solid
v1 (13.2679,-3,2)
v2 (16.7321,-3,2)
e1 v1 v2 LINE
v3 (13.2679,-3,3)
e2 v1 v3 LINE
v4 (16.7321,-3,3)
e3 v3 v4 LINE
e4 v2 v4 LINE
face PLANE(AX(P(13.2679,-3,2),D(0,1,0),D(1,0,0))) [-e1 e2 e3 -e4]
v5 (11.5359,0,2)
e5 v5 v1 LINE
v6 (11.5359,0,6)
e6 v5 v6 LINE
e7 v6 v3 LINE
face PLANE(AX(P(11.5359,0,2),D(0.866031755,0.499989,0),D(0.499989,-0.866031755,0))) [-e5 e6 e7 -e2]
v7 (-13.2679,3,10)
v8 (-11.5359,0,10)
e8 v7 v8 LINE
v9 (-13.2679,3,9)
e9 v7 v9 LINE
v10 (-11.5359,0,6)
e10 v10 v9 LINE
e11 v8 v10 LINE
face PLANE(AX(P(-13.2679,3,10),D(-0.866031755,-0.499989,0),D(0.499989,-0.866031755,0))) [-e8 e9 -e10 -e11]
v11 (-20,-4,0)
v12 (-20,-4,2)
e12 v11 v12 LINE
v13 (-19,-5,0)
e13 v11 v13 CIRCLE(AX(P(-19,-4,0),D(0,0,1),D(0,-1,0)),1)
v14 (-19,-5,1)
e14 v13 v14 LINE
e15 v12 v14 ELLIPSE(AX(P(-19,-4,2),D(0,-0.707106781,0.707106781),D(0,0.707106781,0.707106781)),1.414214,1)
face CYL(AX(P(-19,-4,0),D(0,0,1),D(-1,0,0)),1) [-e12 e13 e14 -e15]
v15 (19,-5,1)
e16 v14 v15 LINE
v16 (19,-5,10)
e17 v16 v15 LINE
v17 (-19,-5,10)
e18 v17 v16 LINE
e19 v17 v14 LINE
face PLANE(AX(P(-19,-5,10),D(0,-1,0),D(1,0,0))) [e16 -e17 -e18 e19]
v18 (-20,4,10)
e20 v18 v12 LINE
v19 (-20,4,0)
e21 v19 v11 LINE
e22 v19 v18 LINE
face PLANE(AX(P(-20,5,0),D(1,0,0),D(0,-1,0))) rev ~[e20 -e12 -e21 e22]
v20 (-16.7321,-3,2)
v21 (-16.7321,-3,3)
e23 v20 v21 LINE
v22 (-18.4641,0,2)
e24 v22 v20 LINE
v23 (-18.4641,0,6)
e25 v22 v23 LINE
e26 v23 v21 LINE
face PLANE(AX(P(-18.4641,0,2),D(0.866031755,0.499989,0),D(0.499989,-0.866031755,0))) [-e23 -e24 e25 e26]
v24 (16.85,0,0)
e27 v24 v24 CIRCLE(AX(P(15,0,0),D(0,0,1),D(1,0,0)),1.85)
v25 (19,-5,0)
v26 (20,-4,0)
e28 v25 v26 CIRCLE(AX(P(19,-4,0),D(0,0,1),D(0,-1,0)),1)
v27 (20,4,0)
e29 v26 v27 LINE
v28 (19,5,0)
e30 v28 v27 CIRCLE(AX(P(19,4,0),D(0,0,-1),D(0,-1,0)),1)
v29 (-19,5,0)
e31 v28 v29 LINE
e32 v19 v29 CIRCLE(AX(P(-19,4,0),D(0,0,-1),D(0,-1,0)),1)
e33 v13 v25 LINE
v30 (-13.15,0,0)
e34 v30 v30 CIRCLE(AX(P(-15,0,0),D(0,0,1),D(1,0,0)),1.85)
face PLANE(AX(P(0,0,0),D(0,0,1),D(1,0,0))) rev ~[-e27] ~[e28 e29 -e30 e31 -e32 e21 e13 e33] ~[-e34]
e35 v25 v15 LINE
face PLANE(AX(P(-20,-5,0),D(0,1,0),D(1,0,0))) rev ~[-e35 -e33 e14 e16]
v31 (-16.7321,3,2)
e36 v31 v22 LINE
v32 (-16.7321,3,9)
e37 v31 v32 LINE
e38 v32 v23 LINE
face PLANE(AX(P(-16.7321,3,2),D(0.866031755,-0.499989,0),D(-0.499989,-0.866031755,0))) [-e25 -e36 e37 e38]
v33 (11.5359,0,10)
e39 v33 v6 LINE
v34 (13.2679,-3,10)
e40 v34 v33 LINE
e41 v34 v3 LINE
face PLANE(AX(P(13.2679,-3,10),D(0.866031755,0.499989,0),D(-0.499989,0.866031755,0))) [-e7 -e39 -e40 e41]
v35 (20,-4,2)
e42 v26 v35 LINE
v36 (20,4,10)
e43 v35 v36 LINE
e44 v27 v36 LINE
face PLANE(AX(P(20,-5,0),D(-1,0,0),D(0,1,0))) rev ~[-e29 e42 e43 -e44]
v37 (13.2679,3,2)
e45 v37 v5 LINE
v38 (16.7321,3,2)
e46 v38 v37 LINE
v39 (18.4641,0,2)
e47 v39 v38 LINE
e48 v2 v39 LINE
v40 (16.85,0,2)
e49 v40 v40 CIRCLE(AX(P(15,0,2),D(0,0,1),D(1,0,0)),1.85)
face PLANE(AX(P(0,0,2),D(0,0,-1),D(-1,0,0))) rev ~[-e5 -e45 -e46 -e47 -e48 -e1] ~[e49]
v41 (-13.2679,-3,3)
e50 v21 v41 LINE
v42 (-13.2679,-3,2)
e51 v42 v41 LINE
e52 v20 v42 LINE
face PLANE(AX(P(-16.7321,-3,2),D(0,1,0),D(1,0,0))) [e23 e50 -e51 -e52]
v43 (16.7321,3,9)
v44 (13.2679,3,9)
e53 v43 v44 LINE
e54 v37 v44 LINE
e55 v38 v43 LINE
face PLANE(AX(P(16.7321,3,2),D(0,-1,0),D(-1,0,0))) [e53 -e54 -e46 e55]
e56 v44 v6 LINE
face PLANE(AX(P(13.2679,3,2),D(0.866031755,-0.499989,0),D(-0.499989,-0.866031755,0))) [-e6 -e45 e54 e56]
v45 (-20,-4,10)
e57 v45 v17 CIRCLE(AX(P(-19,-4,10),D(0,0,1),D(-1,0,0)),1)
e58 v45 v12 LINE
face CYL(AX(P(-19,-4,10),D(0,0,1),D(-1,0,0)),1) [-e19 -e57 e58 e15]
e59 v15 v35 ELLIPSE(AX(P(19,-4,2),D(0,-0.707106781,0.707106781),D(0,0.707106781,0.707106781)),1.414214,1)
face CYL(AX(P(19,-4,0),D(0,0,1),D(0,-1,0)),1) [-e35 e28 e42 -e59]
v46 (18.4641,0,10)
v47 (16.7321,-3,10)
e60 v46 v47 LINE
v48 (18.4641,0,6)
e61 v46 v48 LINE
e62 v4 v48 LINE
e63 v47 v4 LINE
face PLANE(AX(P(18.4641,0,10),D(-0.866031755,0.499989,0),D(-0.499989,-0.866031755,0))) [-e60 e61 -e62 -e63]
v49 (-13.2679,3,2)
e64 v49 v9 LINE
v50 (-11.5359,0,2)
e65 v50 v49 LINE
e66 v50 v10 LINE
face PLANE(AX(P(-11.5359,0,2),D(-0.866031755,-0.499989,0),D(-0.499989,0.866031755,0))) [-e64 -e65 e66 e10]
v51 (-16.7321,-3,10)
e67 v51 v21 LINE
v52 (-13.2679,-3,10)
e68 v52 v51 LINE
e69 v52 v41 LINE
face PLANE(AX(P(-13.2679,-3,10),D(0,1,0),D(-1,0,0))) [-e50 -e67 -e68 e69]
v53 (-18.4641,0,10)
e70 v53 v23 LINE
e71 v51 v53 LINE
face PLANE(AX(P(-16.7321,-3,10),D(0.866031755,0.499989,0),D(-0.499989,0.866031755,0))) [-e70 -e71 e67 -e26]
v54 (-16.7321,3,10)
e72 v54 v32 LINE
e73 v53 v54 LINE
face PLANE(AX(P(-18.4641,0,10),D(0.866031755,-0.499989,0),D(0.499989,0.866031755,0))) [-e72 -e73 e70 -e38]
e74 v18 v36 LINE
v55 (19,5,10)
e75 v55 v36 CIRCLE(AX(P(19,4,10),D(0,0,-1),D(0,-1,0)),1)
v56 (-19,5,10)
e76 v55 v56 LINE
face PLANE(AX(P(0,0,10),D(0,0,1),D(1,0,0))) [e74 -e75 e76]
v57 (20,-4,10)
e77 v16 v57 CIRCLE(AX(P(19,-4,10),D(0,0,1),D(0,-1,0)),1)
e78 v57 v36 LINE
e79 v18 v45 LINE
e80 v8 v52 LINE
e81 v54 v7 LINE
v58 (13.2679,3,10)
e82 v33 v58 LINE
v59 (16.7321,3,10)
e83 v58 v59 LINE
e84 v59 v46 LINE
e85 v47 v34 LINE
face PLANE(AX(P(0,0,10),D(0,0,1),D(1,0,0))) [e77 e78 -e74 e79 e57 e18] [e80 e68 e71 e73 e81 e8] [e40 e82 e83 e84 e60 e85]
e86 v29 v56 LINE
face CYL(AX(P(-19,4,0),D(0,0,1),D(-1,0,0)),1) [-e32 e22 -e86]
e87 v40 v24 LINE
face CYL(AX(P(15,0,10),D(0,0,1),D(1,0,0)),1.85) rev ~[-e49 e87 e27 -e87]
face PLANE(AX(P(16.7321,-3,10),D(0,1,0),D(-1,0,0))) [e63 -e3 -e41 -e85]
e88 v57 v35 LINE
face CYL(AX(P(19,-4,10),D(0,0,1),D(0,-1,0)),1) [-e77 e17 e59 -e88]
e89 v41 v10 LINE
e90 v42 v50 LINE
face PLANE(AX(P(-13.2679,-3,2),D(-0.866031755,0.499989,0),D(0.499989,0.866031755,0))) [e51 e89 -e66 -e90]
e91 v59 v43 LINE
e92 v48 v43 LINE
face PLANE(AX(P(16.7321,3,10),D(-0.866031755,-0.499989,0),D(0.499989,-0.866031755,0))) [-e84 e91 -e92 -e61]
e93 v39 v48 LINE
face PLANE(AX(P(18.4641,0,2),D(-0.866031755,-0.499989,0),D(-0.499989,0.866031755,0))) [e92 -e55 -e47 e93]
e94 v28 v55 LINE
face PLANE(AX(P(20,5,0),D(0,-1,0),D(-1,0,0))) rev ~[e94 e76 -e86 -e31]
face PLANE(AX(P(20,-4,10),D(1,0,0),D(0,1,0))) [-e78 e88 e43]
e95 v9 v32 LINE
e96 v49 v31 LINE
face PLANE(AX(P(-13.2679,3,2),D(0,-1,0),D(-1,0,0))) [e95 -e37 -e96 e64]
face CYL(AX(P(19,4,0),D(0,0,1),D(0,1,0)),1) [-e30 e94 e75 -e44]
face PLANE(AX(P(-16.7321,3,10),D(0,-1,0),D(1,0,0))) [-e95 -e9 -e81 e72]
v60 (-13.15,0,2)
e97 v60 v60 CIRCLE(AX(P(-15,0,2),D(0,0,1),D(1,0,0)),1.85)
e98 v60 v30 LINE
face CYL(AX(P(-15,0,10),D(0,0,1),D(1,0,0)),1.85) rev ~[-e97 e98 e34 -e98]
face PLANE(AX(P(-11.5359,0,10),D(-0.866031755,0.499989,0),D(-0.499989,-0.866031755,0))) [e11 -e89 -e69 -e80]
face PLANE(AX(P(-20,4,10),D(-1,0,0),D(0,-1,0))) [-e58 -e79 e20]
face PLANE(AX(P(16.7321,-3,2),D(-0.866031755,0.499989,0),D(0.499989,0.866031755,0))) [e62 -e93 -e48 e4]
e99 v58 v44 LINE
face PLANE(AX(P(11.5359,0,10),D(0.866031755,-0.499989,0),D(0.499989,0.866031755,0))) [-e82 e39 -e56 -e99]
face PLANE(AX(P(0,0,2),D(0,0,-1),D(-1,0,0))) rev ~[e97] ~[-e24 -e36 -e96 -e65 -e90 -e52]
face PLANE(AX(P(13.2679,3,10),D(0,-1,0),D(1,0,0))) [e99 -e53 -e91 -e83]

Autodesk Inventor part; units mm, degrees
ref_plane "YZ Plane" through (0, 0, 0) normal (1, 0, 0) x (0, 1, 0)
ref_plane "XZ Plane" through (0, 0, 0) normal (0, 1, 0) x (-1, 0, 0)
sketch "Sketch1" plane through (0, 0, 0) normal (0, 0, 1) x (1, 0, 0)
  line L0 (-20, -5) -> (20, -5)
  line L1 (20, -5) -> (20, 5)
  line L2 (20, 5) -> (-20, 5)
  line L3 (-20, 5) -> (-20, -5)
  line L4 (-20, -5) -> (20, 5) construction
  line L5 (20, -5) -> (-20, 5) construction
  point P0 (0, 0)
  dimension "d0" = 10
  dimension "d1" = 40
extrude "Extrusion1" add sketch "Sketch1" along normal blind 10
sketch "Sketch2" plane through (0, 0, 10) normal (0, 0, 1) x (1, 0, 0)
  line L0 (-28, 0) -> (28, 0) projected
  circle A0 centre (-15, 0) radius 1.85
  circle A1 centre (15, 0) radius 1.85
  point P0 (0, 0)
  point P1 (16.85, 0)
  point P2 (13.15, 0)
  dimension "d4" = 3.7
  dimension "d5" = 3.7
  dimension "d6" = 15
  dimension "d7" = 15
extrude "Extrusion2" cut sketch "Sketch2" against normal through all
chamfer "Chamfer1" distance 9 angle 45 1 edges at (0, -5, 10)
ref_plane "Work Plane1" through (0, 0, 2) normal (0, 0, -1) x (-1, 0, 0)
sketch "Sketch3" plane through (0, 0, 2) normal (0, 0, -1) x (-1, 0, 0)
  circle A0 centre (15, 0) radius 1.85 projected
  circle A1 centre (-15, 0) radius 1.85 projected
  line L0 (11.5359, 0) -> (13.2679, 3)
  line L1 (13.2679, 3) -> (16.7321, 3)
  line L2 (16.7321, 3) -> (18.4641, 0)
  line L3 (18.4641, 0) -> (16.7321, -3)
  line L4 (16.7321, -3) -> (13.2679, -3)
  line L5 (13.2679, -3) -> (11.5359, 0)
  line L6 (-18.4641, 0) -> (-16.7321, 3)
  line L7 (-16.7321, 3) -> (-13.2679, 3)
  line L8 (-13.2679, 3) -> (-11.5359, 0)
  line L9 (-11.5359, 0) -> (-13.2679, -3)
  line L10 (-13.2679, -3) -> (-16.7321, -3)
  line L11 (-16.7321, -3) -> (-18.4641, 0)
  point P0 (0, 0)
  point P1 (15, 3)
  dimension "d14" = 6
  dimension "d15" = 6
extrude "Extrusion3" cut sketch "Sketch3" against normal up to surface contours A1 | L0 L1 L2 L3 L4 L5 | L6 L7 L8 L9 L10 L11 surface through (-10, -0.5, 5.5) normal (0, -0.7071068, 0.7071068)
fillet "Fillet1" radius 1 4 edges at (20, 5, 5) (20, -5, 0.5) (-20, 5, 5) (-20, -5, 0.5)
sketch "Sketch4" plane through (0, 0, 10) normal (0, 0, 1) x (1, 0, 0)
  line L0 (16.7321, 3) -> (18.4641, 0) projected
  line L1 (18.4641, 0) -> (16.7321, -3) projected
  line L2 (16.7321, -3) -> (13.2679, -3) projected
  line L3 (13.2679, -3) -> (11.5359, 0) projected
  line L4 (11.5359, 0) -> (13.2679, 3) projected
  line L5 (13.2679, 3) -> (16.7321, 3) projected
  line L6 (-16.7321, 3) -> (-13.2679, 3) projected
  line L7 (-13.2679, 3) -> (-11.5359, 0) projected
  line L8 (-11.5359, 0) -> (-13.2679, -3) projected
  line L9 (-13.2679, -3) -> (-16.7321, -3) projected
  line L10 (-16.7321, -3) -> (-18.4641, 0) projected
  line L11 (-18.4641, 0) -> (-16.7321, 3) projected
  arc A0 (-20, -4) -> (-19, -5) centre (-19, -4) ccw projected
  line L12 (-19, -5) -> (19, -5) projected
  arc A1 (19, -5) -> (20, -4) centre (19, -4) ccw projected
  line L13 (20, -4) -> (20, 4) projected
  line L14 (20, 4) -> (-20, 4) projected
  line L15 (-20, 4) -> (-20, -4) projected
  point P0 (0, 0)
extrude "Extrusion4" add sketch "Sketch4" against normal up to surface surface through (-10, -0.5, 5.5) normal (0, -0.7071068, 0.7071068)
equation "\"d5\" = d4"
equation "\"d7\" = d6"
equation "\"d15\" = d14"
properties part number "_3DPrint"
